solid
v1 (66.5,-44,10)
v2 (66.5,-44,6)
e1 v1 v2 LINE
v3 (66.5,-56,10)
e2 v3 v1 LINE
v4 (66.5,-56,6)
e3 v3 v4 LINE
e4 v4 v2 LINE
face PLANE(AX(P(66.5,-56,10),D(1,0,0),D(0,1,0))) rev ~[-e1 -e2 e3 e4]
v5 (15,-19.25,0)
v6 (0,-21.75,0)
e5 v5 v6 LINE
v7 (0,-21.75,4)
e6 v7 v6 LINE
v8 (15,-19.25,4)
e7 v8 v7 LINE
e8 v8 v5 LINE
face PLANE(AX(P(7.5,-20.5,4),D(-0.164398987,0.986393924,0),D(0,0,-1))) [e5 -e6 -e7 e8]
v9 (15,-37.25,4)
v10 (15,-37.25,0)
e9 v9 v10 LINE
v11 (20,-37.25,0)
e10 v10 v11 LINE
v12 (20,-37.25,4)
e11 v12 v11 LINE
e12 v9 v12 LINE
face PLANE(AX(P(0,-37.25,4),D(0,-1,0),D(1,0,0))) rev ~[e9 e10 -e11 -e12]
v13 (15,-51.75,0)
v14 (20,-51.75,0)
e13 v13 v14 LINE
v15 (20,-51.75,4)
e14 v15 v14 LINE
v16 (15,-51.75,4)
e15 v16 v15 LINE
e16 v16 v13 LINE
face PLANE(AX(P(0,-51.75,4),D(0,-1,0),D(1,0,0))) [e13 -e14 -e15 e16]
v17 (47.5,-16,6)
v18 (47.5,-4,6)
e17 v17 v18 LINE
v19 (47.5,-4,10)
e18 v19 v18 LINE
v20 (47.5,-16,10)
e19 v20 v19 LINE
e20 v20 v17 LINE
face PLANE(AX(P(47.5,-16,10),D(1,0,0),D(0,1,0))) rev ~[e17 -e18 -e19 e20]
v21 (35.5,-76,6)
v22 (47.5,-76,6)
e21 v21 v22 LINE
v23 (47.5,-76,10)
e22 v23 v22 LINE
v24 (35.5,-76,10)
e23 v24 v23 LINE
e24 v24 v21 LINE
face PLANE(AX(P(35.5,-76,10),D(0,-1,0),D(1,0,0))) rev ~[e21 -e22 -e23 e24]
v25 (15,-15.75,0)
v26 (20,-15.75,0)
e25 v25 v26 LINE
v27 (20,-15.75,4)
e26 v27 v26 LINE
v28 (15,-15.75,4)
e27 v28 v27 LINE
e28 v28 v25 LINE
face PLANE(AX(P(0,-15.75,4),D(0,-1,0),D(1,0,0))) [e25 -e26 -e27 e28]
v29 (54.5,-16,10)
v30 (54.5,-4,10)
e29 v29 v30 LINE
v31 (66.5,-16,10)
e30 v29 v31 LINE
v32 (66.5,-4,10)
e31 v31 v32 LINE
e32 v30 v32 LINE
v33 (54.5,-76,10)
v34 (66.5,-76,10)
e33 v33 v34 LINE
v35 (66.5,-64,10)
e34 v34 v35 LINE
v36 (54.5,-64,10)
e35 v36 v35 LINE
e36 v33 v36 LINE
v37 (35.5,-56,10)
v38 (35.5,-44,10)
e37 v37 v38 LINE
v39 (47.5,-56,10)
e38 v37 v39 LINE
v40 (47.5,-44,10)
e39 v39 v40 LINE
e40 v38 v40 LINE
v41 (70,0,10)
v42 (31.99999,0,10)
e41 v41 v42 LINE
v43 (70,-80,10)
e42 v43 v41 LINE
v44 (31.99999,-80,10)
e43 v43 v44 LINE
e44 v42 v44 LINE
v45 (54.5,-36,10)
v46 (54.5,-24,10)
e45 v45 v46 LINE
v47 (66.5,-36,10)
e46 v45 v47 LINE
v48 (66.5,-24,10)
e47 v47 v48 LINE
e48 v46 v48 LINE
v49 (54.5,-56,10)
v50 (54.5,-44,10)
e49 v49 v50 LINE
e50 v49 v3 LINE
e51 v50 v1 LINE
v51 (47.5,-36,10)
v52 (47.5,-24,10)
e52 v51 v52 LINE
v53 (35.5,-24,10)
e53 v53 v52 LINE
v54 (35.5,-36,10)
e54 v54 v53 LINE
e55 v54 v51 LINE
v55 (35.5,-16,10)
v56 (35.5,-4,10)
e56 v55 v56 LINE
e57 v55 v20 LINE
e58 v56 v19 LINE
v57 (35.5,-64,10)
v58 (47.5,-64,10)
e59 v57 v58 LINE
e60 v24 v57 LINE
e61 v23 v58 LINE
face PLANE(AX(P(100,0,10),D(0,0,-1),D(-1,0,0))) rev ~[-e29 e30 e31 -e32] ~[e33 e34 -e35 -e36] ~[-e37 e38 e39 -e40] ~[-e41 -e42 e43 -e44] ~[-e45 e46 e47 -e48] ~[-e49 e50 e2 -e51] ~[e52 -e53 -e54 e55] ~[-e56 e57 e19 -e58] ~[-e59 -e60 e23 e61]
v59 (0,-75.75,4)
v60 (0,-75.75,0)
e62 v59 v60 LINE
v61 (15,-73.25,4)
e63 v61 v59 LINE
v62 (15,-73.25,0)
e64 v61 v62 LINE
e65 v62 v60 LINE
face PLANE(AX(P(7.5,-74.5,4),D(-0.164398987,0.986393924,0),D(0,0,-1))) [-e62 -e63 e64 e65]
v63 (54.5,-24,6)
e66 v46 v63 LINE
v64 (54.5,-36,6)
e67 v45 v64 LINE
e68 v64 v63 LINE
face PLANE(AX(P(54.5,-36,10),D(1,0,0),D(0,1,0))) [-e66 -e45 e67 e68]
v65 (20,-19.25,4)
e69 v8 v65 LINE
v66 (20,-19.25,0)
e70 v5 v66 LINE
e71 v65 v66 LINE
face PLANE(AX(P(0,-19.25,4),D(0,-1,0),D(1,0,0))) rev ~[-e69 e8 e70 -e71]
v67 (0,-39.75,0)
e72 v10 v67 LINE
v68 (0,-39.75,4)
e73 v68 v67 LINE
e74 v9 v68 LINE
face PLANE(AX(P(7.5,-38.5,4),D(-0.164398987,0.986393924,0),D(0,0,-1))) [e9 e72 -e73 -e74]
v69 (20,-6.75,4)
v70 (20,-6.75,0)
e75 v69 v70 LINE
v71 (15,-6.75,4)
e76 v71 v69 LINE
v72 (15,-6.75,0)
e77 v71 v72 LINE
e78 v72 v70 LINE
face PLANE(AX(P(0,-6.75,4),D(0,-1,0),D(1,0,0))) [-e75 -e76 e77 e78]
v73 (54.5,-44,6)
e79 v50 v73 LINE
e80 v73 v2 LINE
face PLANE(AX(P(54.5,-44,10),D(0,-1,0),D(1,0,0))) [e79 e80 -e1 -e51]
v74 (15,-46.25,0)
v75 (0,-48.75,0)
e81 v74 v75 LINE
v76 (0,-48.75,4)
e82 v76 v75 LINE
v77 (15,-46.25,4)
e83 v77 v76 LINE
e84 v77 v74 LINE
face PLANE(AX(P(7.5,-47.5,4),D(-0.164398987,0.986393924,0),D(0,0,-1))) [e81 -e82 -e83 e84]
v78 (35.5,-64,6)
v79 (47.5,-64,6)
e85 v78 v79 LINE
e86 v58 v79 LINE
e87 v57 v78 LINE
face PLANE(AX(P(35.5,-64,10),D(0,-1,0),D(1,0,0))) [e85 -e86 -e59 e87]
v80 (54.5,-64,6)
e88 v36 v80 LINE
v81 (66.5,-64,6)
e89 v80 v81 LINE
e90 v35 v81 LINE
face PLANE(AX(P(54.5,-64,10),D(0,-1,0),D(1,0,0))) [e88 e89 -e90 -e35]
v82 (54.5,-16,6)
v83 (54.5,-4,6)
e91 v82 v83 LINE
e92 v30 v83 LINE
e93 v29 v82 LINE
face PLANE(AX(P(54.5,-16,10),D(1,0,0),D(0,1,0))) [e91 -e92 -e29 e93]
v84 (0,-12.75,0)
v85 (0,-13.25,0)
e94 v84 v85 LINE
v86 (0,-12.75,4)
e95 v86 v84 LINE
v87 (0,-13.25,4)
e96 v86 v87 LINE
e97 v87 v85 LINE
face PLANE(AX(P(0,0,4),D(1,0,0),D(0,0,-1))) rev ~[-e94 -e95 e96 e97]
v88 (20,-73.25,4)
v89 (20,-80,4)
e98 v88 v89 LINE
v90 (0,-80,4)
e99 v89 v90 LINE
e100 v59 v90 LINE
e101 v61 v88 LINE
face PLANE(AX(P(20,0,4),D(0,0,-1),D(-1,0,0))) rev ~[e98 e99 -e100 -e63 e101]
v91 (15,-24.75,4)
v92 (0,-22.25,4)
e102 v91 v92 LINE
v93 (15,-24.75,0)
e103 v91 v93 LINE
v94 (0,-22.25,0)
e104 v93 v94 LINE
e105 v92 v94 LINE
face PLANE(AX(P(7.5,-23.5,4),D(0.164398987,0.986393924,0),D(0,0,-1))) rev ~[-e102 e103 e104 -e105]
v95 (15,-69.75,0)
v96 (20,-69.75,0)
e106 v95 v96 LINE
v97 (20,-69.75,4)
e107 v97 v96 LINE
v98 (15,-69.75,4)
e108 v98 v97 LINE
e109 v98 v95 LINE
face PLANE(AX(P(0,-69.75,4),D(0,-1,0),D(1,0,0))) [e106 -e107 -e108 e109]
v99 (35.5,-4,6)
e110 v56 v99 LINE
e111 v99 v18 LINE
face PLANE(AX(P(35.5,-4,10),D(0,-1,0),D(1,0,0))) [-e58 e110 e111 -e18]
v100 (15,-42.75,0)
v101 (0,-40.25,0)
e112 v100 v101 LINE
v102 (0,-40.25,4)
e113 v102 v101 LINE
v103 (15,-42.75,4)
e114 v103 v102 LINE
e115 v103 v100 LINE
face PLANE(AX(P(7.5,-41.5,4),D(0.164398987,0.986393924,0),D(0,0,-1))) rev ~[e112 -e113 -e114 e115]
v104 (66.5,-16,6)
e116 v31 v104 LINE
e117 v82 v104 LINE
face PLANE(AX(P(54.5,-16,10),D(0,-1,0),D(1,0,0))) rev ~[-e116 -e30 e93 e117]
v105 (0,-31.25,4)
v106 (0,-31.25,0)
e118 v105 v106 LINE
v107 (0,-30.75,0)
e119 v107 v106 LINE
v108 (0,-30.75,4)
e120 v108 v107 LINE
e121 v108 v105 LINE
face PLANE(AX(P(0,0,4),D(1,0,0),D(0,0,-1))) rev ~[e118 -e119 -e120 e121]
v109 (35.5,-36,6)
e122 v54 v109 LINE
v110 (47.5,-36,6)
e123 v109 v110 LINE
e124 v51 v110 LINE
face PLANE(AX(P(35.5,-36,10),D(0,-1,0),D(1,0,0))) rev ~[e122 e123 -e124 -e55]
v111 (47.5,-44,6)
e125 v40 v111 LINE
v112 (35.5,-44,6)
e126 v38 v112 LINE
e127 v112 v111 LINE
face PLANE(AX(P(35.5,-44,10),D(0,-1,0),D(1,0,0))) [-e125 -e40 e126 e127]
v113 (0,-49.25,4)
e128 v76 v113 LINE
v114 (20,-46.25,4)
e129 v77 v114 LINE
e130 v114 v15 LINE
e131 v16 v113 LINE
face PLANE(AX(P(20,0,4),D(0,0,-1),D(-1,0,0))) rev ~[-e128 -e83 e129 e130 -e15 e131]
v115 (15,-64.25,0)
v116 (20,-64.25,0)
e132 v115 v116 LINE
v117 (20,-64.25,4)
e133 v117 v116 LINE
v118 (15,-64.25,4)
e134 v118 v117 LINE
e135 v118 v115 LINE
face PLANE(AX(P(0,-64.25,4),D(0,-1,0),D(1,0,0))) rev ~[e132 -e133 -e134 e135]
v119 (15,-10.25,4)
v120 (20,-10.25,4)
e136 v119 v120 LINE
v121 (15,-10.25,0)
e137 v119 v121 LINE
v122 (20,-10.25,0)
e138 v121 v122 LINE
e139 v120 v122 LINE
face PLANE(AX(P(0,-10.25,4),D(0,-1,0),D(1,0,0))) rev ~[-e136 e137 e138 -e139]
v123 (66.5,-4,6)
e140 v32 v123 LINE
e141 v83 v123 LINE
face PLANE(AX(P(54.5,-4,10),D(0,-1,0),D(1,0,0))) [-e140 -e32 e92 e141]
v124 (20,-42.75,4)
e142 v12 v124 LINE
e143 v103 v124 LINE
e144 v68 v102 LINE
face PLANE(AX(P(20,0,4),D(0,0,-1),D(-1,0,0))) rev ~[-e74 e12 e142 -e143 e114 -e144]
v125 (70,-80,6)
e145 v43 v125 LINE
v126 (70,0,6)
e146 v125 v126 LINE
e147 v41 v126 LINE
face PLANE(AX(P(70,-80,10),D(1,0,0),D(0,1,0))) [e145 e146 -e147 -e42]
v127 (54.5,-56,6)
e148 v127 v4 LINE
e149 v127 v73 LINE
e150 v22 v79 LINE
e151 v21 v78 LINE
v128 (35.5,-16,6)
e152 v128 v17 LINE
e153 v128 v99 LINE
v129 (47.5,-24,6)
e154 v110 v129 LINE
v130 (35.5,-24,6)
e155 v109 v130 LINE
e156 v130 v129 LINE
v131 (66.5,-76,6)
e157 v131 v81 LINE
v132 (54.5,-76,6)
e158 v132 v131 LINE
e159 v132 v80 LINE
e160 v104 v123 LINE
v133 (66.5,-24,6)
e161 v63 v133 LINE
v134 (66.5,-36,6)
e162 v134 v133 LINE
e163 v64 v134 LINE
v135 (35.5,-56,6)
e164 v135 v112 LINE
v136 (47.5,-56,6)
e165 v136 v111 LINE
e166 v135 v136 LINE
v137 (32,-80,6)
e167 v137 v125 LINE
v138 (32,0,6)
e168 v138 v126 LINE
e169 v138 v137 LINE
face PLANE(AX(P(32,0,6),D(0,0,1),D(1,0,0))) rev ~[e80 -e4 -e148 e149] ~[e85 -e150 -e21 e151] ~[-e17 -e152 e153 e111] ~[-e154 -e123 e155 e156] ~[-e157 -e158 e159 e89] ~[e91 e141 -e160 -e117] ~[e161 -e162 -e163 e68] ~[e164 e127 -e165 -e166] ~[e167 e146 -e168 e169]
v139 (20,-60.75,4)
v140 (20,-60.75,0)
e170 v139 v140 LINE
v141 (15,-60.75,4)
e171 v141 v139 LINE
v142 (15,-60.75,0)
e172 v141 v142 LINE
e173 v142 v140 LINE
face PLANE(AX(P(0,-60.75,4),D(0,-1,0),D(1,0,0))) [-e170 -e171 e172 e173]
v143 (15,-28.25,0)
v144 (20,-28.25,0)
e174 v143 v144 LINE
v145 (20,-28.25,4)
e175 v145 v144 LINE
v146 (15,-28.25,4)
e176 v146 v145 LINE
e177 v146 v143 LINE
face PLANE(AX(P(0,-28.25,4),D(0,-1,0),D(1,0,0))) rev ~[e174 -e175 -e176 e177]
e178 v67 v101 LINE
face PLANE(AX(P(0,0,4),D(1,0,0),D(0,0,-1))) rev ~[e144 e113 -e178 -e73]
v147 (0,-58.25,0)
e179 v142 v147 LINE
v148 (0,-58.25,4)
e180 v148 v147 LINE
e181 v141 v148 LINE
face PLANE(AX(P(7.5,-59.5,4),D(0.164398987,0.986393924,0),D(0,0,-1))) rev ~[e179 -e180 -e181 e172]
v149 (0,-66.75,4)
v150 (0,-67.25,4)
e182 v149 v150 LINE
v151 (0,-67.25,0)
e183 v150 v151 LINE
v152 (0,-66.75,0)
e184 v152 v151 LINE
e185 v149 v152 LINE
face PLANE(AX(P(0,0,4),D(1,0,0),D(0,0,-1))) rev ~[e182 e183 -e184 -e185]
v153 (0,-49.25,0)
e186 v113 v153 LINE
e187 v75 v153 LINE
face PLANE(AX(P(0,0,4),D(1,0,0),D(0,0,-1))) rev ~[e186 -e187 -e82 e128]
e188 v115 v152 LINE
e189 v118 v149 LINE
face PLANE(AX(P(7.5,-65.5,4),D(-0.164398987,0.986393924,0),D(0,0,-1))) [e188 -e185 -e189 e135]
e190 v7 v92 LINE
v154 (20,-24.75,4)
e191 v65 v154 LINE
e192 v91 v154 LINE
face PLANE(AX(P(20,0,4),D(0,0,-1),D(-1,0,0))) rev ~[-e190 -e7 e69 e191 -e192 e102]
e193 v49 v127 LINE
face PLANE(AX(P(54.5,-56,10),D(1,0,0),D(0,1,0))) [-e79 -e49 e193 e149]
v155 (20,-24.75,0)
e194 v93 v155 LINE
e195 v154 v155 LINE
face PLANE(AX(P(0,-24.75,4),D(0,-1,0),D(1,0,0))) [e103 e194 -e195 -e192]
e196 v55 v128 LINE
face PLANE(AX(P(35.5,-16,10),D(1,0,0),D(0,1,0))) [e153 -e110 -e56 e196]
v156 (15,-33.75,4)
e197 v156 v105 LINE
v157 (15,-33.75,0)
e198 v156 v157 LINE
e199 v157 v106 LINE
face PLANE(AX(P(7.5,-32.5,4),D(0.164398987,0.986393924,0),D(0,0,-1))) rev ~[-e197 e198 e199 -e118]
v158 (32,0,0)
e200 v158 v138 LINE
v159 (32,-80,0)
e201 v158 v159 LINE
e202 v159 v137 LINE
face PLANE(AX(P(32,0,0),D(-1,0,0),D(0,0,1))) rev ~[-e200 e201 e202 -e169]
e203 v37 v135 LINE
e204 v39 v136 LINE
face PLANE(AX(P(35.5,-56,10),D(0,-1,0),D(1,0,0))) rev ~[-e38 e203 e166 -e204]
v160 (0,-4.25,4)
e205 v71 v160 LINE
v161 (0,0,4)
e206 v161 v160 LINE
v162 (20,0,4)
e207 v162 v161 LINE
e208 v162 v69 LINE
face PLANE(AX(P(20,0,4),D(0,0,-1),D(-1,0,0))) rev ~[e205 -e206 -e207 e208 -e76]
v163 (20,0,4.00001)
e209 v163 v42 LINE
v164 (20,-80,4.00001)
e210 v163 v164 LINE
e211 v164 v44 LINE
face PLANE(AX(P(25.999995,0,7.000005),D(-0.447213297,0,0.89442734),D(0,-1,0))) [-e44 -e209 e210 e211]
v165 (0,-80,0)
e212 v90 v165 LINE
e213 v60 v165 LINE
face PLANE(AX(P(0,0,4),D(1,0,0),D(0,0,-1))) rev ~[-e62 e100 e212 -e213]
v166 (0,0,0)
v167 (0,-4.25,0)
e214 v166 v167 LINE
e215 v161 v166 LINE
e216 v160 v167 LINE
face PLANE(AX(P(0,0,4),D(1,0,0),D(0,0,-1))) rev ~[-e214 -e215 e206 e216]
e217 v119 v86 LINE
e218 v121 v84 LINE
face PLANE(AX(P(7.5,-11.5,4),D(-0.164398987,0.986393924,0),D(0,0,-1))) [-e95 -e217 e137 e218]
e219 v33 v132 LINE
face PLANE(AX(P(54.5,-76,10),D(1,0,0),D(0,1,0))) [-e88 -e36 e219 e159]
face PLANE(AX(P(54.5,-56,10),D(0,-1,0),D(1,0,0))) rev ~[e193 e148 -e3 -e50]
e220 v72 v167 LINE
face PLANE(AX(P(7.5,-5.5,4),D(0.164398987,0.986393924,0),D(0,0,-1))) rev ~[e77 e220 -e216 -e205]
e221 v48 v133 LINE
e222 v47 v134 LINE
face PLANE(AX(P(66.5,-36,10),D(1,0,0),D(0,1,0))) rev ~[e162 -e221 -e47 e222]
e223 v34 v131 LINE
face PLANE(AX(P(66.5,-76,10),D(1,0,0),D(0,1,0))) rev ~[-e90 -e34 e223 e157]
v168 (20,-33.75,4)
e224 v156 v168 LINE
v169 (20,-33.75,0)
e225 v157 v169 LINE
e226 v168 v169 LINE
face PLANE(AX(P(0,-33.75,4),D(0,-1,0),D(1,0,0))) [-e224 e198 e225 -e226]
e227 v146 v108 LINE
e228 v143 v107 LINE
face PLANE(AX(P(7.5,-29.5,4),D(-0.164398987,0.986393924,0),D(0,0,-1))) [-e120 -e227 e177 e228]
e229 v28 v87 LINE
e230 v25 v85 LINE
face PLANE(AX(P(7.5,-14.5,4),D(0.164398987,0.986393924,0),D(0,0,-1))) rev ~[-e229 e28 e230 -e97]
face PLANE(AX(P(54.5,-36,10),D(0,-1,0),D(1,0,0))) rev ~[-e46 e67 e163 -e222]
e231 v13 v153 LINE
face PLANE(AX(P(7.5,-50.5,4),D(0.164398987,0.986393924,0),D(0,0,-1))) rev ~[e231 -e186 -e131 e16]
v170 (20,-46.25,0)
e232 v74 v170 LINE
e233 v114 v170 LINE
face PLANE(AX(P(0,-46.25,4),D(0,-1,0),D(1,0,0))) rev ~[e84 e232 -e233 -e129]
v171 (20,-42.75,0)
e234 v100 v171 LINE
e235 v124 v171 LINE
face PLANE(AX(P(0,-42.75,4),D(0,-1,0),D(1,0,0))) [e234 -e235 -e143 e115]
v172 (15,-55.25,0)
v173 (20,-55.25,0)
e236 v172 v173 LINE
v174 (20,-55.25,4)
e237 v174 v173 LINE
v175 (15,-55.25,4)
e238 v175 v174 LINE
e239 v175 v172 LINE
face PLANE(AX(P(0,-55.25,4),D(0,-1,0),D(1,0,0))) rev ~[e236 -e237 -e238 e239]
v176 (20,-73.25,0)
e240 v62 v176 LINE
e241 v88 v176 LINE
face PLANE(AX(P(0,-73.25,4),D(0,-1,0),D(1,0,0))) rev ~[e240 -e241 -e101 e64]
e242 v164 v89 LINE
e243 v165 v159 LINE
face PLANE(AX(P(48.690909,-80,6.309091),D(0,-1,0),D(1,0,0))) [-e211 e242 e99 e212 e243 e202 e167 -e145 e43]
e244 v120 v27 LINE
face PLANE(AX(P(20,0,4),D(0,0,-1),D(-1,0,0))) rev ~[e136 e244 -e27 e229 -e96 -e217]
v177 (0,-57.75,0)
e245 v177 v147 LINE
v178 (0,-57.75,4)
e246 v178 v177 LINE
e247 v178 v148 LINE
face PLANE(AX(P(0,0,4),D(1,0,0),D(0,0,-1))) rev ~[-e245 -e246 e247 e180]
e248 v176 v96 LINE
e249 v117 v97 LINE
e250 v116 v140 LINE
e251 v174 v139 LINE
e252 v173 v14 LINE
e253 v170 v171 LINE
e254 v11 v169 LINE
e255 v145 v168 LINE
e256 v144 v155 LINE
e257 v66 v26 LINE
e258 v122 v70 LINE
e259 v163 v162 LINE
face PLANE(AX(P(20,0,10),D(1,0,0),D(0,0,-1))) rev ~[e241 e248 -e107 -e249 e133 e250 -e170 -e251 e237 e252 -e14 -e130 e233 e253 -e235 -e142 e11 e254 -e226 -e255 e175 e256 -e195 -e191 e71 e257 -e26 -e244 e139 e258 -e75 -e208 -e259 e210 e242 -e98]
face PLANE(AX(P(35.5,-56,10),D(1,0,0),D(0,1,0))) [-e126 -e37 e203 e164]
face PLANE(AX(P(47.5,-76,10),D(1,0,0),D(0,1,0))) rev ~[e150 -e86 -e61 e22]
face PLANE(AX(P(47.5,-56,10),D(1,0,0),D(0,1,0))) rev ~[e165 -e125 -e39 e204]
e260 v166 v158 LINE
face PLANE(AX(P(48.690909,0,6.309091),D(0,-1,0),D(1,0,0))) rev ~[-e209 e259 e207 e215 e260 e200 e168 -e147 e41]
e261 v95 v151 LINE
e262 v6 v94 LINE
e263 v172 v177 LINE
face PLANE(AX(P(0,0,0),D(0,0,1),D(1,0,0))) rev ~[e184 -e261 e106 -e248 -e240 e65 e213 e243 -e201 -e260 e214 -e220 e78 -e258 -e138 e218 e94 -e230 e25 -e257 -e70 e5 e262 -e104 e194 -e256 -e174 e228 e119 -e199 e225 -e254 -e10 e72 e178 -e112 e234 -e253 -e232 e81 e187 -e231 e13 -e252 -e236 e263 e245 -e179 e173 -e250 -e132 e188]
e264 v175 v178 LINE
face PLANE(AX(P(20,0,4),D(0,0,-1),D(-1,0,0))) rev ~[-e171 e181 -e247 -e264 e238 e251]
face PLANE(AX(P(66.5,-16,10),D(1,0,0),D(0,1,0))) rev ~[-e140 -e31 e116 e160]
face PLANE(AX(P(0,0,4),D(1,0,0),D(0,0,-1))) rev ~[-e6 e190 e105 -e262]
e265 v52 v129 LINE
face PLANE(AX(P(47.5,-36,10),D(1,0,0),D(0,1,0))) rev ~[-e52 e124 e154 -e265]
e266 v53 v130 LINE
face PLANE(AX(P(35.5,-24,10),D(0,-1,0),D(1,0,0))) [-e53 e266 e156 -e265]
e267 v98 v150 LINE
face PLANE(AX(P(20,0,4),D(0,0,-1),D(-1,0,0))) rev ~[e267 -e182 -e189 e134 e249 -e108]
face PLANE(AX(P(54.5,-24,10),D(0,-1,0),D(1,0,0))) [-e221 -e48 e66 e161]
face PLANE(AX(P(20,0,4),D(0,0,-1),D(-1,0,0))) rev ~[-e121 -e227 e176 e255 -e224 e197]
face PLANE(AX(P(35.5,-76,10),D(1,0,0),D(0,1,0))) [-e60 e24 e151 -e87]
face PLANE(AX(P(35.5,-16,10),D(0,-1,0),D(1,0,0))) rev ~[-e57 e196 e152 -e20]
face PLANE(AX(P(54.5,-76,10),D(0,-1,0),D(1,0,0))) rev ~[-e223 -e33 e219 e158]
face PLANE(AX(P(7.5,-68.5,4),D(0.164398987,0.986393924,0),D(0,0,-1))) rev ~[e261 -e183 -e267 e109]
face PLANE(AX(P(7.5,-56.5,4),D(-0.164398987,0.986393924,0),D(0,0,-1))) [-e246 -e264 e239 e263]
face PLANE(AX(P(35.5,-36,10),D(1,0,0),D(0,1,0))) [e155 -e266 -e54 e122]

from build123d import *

# Parameters (mm, degrees)
F1_DEPTH   = 80
F2_W       = 20
F2_H       = 3.5
F3_DEPTH   = 4.001
F4_SIZE2   = 11.99999
F4_SIZE    = 5.99999
F5_SIZE2   = 2.5
F5_SIZE    = 15
F5_2_SIZE2 = 2.5
F5_2_SIZE  = 15
F5_3_SIZE2 = 2.5
F5_3_SIZE  = 15
F5_4_SIZE2 = 2.5
F5_4_SIZE  = 15
F5_5_SIZE2 = 2.5
F5_5_SIZE  = 15
F5_6_SIZE2 = 2.5
F5_6_SIZE  = 15
F5_7_SIZE2 = 2.5
F5_7_SIZE  = 15
F5_8_SIZE2 = 2.5
F5_8_SIZE  = 15
F6_SIZE2   = 2.5
F6_SIZE    = 15
F6_2_SIZE2 = 2.5
F6_2_SIZE  = 15
F6_3_SIZE2 = 2.5
F6_3_SIZE  = 15
F6_4_SIZE2 = 2.5
F6_4_SIZE  = 15
F6_5_SIZE2 = 2.5
F6_5_SIZE  = 15
F6_6_SIZE2 = 2.5
F6_6_SIZE  = 15
F6_7_SIZE2 = 2.5
F6_7_SIZE  = 15
F6_8_SIZE2 = 2.5
F6_8_SIZE  = 15
F7_W       = 30
F7_H       = 80
F8_DEPTH   = 25
F9_W       = 12
F9_H       = 12
F10_DEPTH  = 10.001


# Not quite as in the source:
# - a fillet or chamfer is up to 0.001 mm smaller than in the source, because OpenCascade refuses the exact size


with BuildPart() as f1:
    # F0 (on Front) → F1 (new body)
    with BuildSketch(Plane.XZ):
        Polygon((0, 4), (0, 0), (32, 0), (32, 6), (100, 6), (100, 10), (20, 10), (20, 4), align=None)
    extrude(amount=F1_DEPTH)

    # F2 (on face) → F3 (cut, through all)
    with BuildSketch(Plane.XY.offset(4)):
        with Locations((10, -35.5)):
            Rectangle(F2_W, F2_H)
        with Locations((10, -26.5)):
            Rectangle(F2_W, F2_H)
        with Locations((10, -17.5)):
            Rectangle(F2_W, F2_H)
        with Locations((10, -8.5)):
            Rectangle(F2_W, F2_H)
        with Locations((10, -71.5)):
            Rectangle(F2_W, F2_H)
        with Locations((10, -53.5)):
            Rectangle(F2_W, F2_H)
        with Locations((10, -44.5)):
            Rectangle(F2_W, F2_H)
        with Locations((10, -62.5)):
            Rectangle(F2_W, F2_H)
    extrude(amount=-F3_DEPTH, mode=Mode.SUBTRACT)

    # F4 (size 6 and 12 in the source; OpenCascade refuses exactly that, so slightly less here)
    f4_edges = [f1.edges().sort_by_distance(p)[0] for p in [
        (20, -40, 10),
    ]]
    f4_side = f1.faces().sort_by_distance((20, -40, 6.054054))[0]
    chamfer(f4_edges, length=F4_SIZE, length2=F4_SIZE2, reference=f4_side)

    # F5
    f5_edges = [f1.edges().sort_by_distance(p)[0] for p in [
        (0, -6.75, 2),
    ]]
    f5_side = f1.faces().sort_by_distance((10, -6.75, 2))[0]
    chamfer(f5_edges, length=F5_SIZE, length2=F5_SIZE2, reference=f5_side)

    # F5#2
    f5_2_edges = [f1.edges().sort_by_distance(p)[0] for p in [
        (0, -69.75, 2),
    ]]
    f5_2_side = f1.faces().sort_by_distance((10, -69.75, 2))[0]
    chamfer(f5_2_edges, length=F5_2_SIZE, length2=F5_2_SIZE2, reference=f5_2_side)

    # F5#3
    f5_3_edges = [f1.edges().sort_by_distance(p)[0] for p in [
        (0, -15.75, 2),
    ]]
    f5_3_side = f1.faces().sort_by_distance((10, -15.75, 2))[0]
    chamfer(f5_3_edges, length=F5_3_SIZE, length2=F5_3_SIZE2, reference=f5_3_side)

    # F5#4
    f5_4_edges = [f1.edges().sort_by_distance(p)[0] for p in [
        (0, -60.75, 2),
    ]]
    f5_4_side = f1.faces().sort_by_distance((10, -60.75, 2))[0]
    chamfer(f5_4_edges, length=F5_4_SIZE, length2=F5_4_SIZE2, reference=f5_4_side)

    # F5#5
    f5_5_edges = [f1.edges().sort_by_distance(p)[0] for p in [
        (0, -24.75, 2),
    ]]
    f5_5_side = f1.faces().sort_by_distance((10, -24.75, 2))[0]
    chamfer(f5_5_edges, length=F5_5_SIZE, length2=F5_5_SIZE2, reference=f5_5_side)

    # F5#6
    f5_6_edges = [f1.edges().sort_by_distance(p)[0] for p in [
        (0, -51.75, 2),
    ]]
    f5_6_side = f1.faces().sort_by_distance((10, -51.75, 2))[0]
    chamfer(f5_6_edges, length=F5_6_SIZE, length2=F5_6_SIZE2, reference=f5_6_side)

    # F5#7
    f5_7_edges = [f1.edges().sort_by_distance(p)[0] for p in [
        (0, -33.75, 2),
    ]]
    f5_7_side = f1.faces().sort_by_distance((10, -33.75, 2))[0]
    chamfer(f5_7_edges, length=F5_7_SIZE, length2=F5_7_SIZE2, reference=f5_7_side)

    # F5#8
    f5_8_edges = [f1.edges().sort_by_distance(p)[0] for p in [
        (0, -42.75, 2),
    ]]
    f5_8_side = f1.faces().sort_by_distance((10, -42.75, 2))[0]
    chamfer(f5_8_edges, length=F5_8_SIZE, length2=F5_8_SIZE2, reference=f5_8_side)

    # F6
    f6_edges = [f1.edges().sort_by_distance(p)[0] for p in [
        (0, -37.25, 2),
    ]]
    f6_side = f1.faces().sort_by_distance((10, -37.25, 2))[0]
    chamfer(f6_edges, length=F6_SIZE, length2=F6_SIZE2, reference=f6_side)

    # F6#2
    f6_2_edges = [f1.edges().sort_by_distance(p)[0] for p in [
        (0, -46.25, 2),
    ]]
    f6_2_side = f1.faces().sort_by_distance((10, -46.25, 2))[0]
    chamfer(f6_2_edges, length=F6_2_SIZE, length2=F6_2_SIZE2, reference=f6_2_side)

    # F6#3
    f6_3_edges = [f1.edges().sort_by_distance(p)[0] for p in [
        (0, -28.25, 2),
    ]]
    f6_3_side = f1.faces().sort_by_distance((10, -28.25, 2))[0]
    chamfer(f6_3_edges, length=F6_3_SIZE, length2=F6_3_SIZE2, reference=f6_3_side)

    # F6#4
    f6_4_edges = [f1.edges().sort_by_distance(p)[0] for p in [
        (0, -55.25, 2),
    ]]
    f6_4_side = f1.faces().sort_by_distance((10, -55.25, 2))[0]
    chamfer(f6_4_edges, length=F6_4_SIZE, length2=F6_4_SIZE2, reference=f6_4_side)

    # F6#5
    f6_5_edges = [f1.edges().sort_by_distance(p)[0] for p in [
        (0, -19.25, 2),
    ]]
    f6_5_side = f1.faces().sort_by_distance((10, -19.25, 2))[0]
    chamfer(f6_5_edges, length=F6_5_SIZE, length2=F6_5_SIZE2, reference=f6_5_side)

    # F6#6
    f6_6_edges = [f1.edges().sort_by_distance(p)[0] for p in [
        (0, -64.25, 2),
    ]]
    f6_6_side = f1.faces().sort_by_distance((10, -64.25, 2))[0]
    chamfer(f6_6_edges, length=F6_6_SIZE, length2=F6_6_SIZE2, reference=f6_6_side)

    # F6#7
    f6_7_edges = [f1.edges().sort_by_distance(p)[0] for p in [
        (0, -10.25, 2),
    ]]
    f6_7_side = f1.faces().sort_by_distance((10, -10.25, 2))[0]
    chamfer(f6_7_edges, length=F6_7_SIZE, length2=F6_7_SIZE2, reference=f6_7_side)

    # F6#8
    f6_8_edges = [f1.edges().sort_by_distance(p)[0] for p in [
        (0, -73.25, 2),
    ]]
    f6_8_side = f1.faces().sort_by_distance((10, -73.25, 2))[0]
    chamfer(f6_8_edges, length=F6_8_SIZE, length2=F6_8_SIZE2, reference=f6_8_side)

    # F7 (on face) → F8 (cut)
    with BuildSketch(Plane.XY.offset(10)):
        with Locations((85, -40)):
            Rectangle(F7_W, F7_H)
    extrude(amount=-F8_DEPTH, mode=Mode.SUBTRACT)

    # F9 (on face) → F10 (cut, through all)
    with BuildSketch(Plane.XY.offset(10)):
        with Locations((41.5, -10)):
            Rectangle(F9_W, F9_H)
        with Locations((41.5, -30)):
            Rectangle(F9_W, F9_H)
        with Locations((41.5, -50)):
            Rectangle(F9_W, F9_H)
        with Locations((41.5, -70)):
            Rectangle(F9_W, F9_H)
        with Locations((60.5, -30)):
            Rectangle(F9_W, F9_H)
        with Locations((60.5, -70)):
            Rectangle(F9_W, F9_H)
        with Locations((60.5, -10)):
            Rectangle(F9_W, F9_H)
        with Locations((60.5, -50)):
            Rectangle(F9_W, F9_H)
    extrude(amount=-F10_DEPTH, mode=Mode.SUBTRACT)


solid = f1.part
